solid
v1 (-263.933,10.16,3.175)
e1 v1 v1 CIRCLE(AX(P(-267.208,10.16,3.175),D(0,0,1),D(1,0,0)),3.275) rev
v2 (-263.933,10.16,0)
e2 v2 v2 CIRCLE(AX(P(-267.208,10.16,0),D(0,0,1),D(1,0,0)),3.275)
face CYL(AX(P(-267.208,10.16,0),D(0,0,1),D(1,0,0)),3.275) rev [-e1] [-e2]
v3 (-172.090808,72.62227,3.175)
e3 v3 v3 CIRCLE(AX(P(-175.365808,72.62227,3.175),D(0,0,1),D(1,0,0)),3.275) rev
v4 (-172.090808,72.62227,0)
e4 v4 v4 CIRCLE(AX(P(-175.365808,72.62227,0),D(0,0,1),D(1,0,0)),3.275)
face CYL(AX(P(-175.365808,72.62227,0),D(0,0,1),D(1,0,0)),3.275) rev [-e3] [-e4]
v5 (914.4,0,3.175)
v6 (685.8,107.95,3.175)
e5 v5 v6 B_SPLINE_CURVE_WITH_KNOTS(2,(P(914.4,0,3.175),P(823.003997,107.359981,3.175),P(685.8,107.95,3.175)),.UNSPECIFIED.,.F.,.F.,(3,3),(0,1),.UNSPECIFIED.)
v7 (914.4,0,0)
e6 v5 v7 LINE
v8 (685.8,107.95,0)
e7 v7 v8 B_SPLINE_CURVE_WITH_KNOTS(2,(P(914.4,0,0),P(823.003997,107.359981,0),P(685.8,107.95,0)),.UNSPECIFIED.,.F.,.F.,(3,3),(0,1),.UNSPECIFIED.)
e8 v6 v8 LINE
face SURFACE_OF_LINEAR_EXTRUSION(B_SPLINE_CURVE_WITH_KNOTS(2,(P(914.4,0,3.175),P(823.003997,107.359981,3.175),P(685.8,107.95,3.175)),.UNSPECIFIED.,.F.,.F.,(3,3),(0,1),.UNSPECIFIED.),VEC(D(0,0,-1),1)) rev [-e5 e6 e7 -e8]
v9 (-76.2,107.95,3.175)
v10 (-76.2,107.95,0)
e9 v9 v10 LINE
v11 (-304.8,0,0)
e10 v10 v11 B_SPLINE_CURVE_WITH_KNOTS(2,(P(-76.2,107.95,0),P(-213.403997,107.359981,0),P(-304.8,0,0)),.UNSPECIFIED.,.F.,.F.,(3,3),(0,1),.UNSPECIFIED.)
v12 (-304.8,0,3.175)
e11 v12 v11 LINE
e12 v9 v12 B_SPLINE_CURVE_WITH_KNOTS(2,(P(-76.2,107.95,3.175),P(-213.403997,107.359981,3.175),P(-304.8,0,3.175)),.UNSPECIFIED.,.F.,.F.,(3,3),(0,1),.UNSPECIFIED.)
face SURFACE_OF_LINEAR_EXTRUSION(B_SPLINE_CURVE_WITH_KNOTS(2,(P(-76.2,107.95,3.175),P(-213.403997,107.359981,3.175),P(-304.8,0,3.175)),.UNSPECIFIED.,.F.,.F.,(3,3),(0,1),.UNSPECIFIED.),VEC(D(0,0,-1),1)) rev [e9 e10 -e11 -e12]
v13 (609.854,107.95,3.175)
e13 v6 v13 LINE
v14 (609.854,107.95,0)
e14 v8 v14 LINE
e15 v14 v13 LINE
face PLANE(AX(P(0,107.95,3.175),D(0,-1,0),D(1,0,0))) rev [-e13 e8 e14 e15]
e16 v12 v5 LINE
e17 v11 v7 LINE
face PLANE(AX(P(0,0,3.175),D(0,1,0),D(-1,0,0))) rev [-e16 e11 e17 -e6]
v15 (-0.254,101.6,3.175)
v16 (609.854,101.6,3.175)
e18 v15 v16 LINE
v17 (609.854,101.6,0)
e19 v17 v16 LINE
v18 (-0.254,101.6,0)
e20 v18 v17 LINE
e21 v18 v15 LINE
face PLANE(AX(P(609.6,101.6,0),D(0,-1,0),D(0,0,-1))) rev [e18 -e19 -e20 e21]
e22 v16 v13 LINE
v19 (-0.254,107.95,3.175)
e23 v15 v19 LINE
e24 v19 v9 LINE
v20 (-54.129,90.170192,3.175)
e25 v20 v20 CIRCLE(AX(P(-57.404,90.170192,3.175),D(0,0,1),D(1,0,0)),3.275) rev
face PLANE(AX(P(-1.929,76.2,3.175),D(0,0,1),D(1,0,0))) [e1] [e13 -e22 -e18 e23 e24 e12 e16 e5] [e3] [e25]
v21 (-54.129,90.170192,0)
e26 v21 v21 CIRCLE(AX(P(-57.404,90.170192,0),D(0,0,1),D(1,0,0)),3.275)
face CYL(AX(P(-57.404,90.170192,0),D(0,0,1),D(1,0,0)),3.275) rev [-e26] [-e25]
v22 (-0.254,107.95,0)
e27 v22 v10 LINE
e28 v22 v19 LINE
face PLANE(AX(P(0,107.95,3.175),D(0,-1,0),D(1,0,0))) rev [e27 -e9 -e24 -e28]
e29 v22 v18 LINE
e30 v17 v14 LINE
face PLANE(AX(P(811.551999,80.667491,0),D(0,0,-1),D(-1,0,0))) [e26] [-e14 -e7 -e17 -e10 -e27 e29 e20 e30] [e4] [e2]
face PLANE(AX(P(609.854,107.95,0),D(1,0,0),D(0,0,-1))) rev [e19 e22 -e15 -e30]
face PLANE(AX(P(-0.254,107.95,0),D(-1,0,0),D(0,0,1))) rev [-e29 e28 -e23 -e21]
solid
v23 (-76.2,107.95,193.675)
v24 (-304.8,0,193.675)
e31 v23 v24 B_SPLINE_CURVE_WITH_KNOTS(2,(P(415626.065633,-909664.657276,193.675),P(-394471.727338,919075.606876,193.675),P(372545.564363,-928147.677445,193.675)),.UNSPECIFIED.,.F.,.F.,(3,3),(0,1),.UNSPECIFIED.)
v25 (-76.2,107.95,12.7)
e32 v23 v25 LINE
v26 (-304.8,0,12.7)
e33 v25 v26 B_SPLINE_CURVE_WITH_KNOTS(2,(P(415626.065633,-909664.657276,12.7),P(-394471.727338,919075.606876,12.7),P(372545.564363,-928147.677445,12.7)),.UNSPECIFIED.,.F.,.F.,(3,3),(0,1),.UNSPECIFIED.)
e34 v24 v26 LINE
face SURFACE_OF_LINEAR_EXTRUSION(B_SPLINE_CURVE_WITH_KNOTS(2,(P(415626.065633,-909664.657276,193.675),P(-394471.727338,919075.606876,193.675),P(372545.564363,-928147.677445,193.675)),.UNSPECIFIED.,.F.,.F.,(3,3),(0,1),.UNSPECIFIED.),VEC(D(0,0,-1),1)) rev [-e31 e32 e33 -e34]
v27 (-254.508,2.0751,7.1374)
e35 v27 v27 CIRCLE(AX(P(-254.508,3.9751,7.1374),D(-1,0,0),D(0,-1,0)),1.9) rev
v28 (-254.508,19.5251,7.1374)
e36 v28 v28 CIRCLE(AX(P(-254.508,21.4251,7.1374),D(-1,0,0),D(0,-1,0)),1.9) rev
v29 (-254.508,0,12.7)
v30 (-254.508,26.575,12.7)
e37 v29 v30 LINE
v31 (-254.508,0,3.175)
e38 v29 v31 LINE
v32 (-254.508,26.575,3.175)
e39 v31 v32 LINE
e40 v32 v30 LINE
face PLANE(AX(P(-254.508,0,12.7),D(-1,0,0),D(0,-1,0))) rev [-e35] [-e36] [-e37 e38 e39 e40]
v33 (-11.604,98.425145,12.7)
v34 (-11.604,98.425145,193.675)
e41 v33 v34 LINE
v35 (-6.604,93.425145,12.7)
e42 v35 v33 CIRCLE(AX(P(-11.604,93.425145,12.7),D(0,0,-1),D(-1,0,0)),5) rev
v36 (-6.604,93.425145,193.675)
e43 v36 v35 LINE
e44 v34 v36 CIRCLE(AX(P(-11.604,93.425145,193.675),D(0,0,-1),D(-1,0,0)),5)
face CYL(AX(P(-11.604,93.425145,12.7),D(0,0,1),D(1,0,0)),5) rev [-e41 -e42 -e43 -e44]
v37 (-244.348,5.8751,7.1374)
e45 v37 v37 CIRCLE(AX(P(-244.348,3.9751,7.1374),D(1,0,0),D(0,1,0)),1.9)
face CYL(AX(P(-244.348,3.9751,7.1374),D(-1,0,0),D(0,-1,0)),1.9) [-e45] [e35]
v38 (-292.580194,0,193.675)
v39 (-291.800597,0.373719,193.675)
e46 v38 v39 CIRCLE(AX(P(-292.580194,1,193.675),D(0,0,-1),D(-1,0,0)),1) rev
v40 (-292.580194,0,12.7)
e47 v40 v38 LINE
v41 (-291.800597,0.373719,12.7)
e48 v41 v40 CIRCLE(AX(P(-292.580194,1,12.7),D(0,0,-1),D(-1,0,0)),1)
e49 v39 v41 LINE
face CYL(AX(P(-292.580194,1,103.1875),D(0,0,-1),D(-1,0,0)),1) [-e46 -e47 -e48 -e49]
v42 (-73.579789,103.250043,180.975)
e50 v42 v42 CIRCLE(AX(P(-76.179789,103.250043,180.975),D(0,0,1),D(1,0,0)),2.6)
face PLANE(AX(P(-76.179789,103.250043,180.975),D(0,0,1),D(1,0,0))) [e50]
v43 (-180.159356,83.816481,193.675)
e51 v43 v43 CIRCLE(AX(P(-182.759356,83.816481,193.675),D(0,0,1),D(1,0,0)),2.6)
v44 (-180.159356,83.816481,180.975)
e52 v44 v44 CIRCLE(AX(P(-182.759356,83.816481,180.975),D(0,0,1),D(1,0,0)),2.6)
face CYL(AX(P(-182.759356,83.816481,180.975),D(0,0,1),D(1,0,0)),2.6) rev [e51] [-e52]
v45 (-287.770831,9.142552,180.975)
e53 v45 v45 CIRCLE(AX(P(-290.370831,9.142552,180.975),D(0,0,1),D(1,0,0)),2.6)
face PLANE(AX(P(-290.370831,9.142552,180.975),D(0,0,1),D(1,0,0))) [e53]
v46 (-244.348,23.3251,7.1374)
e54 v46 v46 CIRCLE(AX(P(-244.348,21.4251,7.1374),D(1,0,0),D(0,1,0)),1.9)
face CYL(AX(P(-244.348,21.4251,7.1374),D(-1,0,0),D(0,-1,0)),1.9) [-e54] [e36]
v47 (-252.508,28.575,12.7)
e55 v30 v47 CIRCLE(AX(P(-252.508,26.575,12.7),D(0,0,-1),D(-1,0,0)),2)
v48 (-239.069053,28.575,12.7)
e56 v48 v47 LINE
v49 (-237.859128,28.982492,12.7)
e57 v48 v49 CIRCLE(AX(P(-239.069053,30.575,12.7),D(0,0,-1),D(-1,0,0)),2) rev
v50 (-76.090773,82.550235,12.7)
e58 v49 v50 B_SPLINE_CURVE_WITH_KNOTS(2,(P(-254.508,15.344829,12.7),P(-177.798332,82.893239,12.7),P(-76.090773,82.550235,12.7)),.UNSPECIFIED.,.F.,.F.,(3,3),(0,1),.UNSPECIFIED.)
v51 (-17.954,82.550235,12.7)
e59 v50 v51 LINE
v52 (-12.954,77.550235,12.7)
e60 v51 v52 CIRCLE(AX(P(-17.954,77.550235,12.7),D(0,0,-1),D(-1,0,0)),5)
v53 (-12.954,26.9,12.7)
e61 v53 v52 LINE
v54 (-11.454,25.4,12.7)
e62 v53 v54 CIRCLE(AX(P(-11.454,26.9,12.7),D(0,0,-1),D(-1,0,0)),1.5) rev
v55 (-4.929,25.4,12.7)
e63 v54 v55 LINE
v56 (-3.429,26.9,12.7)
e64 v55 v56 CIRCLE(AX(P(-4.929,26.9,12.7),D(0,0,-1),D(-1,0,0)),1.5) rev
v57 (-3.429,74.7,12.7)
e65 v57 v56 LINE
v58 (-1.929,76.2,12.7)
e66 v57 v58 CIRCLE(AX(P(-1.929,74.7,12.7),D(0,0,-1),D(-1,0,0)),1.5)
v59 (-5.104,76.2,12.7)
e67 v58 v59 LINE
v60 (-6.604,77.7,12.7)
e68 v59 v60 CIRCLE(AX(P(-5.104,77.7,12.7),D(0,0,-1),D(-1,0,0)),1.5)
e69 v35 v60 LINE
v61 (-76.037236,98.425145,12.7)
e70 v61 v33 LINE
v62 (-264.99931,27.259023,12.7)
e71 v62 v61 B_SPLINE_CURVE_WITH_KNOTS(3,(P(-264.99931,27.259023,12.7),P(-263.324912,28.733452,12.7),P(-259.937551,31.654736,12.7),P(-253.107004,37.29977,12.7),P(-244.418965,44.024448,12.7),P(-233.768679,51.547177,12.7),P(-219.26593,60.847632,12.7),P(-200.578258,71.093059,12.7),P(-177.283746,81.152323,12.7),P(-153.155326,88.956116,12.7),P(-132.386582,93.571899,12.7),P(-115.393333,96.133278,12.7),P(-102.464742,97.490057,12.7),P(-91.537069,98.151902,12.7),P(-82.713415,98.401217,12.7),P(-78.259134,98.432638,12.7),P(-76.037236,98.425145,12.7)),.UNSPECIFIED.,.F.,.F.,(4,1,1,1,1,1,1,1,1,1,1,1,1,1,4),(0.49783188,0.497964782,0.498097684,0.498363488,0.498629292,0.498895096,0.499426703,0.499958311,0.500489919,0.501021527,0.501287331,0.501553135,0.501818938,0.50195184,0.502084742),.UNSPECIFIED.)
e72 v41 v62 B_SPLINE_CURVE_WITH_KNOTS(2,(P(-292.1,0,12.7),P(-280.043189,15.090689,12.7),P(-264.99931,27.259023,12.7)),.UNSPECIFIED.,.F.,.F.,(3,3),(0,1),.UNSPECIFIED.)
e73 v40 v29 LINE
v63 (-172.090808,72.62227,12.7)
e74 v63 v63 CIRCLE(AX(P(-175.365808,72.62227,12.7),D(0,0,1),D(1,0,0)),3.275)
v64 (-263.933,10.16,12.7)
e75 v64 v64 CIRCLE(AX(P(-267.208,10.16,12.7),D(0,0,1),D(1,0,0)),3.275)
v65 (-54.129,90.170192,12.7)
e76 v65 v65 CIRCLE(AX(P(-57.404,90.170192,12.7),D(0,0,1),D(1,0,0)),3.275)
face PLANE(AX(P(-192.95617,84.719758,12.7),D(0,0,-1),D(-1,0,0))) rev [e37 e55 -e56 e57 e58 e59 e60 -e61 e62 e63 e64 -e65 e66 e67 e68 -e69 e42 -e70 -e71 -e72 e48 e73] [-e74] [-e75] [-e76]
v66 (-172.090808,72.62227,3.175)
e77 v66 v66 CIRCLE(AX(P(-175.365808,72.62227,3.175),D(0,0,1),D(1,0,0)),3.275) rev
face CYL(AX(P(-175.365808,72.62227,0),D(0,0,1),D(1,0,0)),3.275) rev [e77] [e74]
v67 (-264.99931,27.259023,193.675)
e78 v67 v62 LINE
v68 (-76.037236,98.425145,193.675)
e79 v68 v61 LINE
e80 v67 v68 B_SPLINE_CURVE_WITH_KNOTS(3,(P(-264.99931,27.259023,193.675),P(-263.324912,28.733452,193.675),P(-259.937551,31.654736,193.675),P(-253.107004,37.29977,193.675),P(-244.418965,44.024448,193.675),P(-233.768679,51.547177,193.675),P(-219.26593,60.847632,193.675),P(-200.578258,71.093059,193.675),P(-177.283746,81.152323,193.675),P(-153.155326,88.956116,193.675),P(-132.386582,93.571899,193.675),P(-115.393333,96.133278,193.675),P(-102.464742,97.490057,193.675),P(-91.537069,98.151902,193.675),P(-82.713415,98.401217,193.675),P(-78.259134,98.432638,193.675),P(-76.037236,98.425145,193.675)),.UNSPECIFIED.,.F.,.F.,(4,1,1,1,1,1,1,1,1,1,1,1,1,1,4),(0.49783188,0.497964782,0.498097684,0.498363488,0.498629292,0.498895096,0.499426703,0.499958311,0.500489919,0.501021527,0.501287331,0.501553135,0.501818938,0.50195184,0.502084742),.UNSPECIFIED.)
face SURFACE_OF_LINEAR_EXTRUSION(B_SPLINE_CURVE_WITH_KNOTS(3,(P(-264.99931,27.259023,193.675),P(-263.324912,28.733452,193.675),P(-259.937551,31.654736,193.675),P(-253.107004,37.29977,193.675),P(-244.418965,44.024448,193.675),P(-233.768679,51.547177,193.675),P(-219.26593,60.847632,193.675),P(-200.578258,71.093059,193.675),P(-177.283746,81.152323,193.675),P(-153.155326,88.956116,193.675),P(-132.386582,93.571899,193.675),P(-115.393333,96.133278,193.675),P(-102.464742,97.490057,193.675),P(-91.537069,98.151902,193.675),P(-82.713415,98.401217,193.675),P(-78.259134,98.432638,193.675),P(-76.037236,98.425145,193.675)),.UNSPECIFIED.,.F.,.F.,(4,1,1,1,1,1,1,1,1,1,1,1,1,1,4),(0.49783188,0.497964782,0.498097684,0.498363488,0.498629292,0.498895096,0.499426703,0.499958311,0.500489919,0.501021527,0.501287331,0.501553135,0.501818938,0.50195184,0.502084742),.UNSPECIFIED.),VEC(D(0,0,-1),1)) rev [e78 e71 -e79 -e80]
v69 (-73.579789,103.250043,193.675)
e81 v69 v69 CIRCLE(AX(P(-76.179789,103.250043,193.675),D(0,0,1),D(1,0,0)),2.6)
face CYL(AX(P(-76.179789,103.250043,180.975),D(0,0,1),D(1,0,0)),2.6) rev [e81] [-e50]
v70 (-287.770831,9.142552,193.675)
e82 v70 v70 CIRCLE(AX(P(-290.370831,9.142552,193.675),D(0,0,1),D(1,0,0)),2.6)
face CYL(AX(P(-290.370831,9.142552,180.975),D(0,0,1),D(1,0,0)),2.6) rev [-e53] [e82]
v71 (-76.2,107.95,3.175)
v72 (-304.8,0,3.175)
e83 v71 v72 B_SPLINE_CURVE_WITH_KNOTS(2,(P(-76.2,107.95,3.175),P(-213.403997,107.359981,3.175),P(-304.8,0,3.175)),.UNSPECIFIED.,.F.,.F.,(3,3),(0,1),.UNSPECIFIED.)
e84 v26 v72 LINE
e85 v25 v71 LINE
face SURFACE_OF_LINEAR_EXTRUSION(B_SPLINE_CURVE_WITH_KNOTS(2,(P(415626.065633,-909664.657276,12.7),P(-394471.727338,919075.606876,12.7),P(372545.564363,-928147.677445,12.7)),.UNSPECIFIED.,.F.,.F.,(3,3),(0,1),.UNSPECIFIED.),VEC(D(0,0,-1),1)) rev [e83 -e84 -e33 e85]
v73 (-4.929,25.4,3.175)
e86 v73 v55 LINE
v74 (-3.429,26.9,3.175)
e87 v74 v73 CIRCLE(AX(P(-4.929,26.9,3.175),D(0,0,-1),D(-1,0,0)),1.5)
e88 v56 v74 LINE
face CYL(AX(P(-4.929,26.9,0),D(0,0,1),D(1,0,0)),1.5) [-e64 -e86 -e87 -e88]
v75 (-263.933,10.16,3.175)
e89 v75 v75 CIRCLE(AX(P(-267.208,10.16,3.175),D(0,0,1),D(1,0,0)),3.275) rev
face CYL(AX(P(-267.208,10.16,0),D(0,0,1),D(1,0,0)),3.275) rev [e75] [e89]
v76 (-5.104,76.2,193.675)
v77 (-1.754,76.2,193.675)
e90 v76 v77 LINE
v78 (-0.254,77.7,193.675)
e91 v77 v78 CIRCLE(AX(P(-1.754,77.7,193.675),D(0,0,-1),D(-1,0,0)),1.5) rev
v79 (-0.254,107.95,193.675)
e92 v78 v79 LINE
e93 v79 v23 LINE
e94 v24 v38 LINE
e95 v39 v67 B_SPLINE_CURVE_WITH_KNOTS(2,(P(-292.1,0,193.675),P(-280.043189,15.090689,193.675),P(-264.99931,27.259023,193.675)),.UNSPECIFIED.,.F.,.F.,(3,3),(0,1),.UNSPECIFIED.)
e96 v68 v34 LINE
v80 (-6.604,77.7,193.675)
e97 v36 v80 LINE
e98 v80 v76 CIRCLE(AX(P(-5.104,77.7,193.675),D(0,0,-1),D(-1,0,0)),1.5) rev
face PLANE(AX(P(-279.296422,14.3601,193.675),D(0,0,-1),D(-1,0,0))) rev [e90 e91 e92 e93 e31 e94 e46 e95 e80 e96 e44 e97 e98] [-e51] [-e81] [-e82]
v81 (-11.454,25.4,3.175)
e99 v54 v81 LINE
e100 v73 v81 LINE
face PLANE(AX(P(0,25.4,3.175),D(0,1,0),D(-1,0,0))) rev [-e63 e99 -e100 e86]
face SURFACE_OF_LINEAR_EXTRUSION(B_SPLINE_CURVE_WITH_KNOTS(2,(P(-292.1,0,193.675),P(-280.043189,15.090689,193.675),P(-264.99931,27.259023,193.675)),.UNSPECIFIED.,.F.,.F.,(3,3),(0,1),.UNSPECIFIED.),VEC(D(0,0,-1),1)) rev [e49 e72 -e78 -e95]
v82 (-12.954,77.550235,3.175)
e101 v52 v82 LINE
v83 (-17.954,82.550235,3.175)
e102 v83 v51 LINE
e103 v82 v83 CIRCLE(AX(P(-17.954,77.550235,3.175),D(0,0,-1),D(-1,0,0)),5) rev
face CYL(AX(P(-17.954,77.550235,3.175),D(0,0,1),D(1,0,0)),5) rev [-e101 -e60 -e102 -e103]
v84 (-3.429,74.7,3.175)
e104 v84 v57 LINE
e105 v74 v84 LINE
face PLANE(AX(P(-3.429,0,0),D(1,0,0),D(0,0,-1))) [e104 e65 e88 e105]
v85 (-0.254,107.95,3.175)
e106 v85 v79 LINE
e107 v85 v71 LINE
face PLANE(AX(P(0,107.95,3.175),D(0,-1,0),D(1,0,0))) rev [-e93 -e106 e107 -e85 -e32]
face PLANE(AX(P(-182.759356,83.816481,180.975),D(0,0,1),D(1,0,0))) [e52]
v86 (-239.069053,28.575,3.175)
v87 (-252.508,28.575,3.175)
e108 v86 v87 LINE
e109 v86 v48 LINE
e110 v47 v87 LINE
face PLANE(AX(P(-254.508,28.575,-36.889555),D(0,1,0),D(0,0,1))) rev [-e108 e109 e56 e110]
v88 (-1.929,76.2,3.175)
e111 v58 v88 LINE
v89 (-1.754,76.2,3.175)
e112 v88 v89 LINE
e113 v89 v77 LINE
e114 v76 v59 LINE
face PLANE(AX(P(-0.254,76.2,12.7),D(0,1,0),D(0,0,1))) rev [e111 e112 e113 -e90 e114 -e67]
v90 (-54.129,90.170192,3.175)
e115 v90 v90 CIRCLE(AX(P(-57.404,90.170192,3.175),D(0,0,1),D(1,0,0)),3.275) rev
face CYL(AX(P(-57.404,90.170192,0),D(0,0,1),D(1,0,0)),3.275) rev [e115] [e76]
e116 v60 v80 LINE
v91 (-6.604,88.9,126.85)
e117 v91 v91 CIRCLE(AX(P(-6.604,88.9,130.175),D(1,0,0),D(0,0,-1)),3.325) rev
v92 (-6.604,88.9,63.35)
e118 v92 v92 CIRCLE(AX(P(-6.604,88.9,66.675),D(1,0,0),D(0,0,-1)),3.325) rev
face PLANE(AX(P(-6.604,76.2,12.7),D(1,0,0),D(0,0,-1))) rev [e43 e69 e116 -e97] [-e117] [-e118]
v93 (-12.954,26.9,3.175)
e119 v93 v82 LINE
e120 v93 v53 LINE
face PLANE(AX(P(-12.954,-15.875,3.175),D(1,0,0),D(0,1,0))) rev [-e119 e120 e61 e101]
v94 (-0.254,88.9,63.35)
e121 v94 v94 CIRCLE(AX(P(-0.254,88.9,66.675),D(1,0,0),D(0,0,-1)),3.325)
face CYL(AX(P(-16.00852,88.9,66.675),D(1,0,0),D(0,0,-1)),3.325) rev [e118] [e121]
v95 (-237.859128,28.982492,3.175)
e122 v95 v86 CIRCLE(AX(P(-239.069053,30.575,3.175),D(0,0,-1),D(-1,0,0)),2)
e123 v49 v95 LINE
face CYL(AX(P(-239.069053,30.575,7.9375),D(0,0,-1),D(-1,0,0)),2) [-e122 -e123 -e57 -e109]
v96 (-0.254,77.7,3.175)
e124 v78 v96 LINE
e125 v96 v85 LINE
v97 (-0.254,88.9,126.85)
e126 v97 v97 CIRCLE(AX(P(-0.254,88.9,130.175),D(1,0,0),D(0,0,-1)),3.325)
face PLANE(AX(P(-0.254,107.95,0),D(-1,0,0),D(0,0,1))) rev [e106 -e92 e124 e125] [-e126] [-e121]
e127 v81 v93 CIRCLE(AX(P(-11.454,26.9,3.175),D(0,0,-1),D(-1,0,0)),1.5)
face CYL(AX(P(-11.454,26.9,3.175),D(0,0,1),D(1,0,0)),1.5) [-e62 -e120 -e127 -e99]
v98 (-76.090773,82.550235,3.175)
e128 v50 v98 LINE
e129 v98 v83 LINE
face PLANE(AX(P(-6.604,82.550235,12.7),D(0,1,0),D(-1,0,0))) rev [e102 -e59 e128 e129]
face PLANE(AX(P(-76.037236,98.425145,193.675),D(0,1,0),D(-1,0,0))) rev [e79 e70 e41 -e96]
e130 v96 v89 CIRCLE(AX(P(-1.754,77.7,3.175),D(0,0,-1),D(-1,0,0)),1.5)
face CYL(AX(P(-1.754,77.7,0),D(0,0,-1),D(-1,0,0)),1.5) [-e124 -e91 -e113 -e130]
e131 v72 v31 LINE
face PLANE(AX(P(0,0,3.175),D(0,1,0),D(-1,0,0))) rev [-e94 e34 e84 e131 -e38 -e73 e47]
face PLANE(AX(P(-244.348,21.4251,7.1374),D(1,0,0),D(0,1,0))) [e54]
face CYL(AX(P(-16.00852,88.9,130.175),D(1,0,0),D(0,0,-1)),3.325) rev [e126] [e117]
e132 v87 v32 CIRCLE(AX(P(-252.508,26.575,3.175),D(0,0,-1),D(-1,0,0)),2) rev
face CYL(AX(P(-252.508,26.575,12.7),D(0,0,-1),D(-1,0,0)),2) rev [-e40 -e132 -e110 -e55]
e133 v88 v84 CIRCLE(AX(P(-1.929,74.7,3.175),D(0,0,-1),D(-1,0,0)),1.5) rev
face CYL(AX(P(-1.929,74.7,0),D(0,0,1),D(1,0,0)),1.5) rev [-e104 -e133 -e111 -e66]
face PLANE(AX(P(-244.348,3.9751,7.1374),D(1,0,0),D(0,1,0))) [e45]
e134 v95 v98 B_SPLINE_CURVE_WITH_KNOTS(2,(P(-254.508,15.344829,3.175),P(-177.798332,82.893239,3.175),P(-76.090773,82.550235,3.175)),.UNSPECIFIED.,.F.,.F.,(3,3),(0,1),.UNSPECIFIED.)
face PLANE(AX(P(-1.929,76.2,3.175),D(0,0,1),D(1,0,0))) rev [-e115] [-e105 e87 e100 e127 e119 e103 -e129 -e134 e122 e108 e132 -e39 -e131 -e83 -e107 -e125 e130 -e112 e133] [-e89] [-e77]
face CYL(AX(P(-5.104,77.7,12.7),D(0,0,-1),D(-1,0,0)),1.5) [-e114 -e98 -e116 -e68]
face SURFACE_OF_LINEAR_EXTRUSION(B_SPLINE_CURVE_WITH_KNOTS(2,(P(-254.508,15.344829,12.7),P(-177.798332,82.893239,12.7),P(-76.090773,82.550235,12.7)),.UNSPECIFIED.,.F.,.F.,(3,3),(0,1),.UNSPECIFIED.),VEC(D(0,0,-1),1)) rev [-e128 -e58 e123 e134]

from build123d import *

# Parameters (mm, degrees)
BOSS_EXTRUDE1_DEPTH = 3.175
CUT_EXTRUDE1_DEPTH  = 921.755474233
BOSS_EXTRUDE2_DEPTH = 9.525
BOSS_EXTRUDE3_DEPTH = 180.975
SKETCH6_W           = 28.082698006
SKETCH6_H           = 28.575
CUT_EXTRUDE2_DEPTH  = 9.525
SKETCH7_R           = 3.275
CUT_EXTRUDE3_DEPTH  = 939.366939617
SKETCH8_R           = 3.325
CUT_EXTRUDE5_DEPTH  = 6.35
SKETCH9_R           = 2.6
SKETCH9_R_2         = 2.600000001
CUT_EXTRUDE6_DEPTH  = 12.7
SKETCH11_R          = 1.9
BOSS_EXTRUDE5_DEPTH = 10.16
SKETCH14_W          = 12.7
SKETCH14_H          = 9.525
BOSS_EXTRUDE8_DEPTH = 57.150234853
SKETCH17_W          = 9.525
SKETCH17_H          = 50.8
CUT_EXTRUDE9_DEPTH  = 3.175
FILLET1_R           = 5
FILLET2_R           = 2
FILLET3_R           = 1
FILLET8_R           = 5
FILLET9_R           = 1.5
FILLET10_R          = 1.5


# Read off the part's stored shape, not the designer's step: Split2
with BuildPart() as part:
    # Sketch1 → Boss-Extrude1 (new body)
    with BuildSketch(Plane.XY):
        with BuildLine():
            Line((0, 0), (-304.8, 0))
            add(Edge.make_bspline(
                [(-304.8, 0), (-213.403997347, 107.359981337), (-76.2, 107.95)],
                knots=[0, 0, 0, 1, 1, 1], degree=2))
            Line((-76.2, 107.95), (0, 107.95))
            Line((0, 107.95), (609.6, 107.95))
            Line((609.6, 107.95), (685.8, 107.95))
            add(Edge.make_bspline(
                [(914.4, 0), (823.003997347, 107.359981337), (685.8, 107.95)],
                knots=[0, 0, 0, 1, 1, 1], degree=2))
            Line((914.4, 0), (609.6, 0))
            Line((609.6, 0), (0, 0))
        make_face()
    extrude(amount=BOSS_EXTRUDE1_DEPTH)

    # Sketch2 → Cut-Extrude1 (cut, through all)
    with BuildSketch(Plane.XY.offset(3.175)):
        Polygon((0, 107.95), (609.6, 107.95), (609.854, 107.95), (609.854, 101.6), (609.6, 101.6), (0, 101.6), (-0.254, 101.6), (-0.254, 107.95), align=None)
    extrude(amount=-CUT_EXTRUDE1_DEPTH, mode=Mode.SUBTRACT)

    # Sketch3 → Boss-Extrude2 (add)
    with BuildSketch(Plane.XY.offset(3.175)):
        with BuildLine():
            Line((-304.8, 0), (-254.508, 0))
            Line((-254.508, 0), (-254.508, 15.344828713))
            add(Edge.make_bspline(
                [(-254.508, 15.344828713), (-177.798332328, 82.893238953), (-76.090773332, 82.550234853)],
                knots=[0, 0, 0, 1, 1, 1], degree=2))
            Line((-76.090773332, 82.550234853), (-6.604, 82.550234853))
            Line((-6.604, 82.550234853), (-6.604, 76.2))
            Line((-6.604, 76.2), (-0.254, 76.2))
            Line((-0.254, 76.2), (-0.254, 107.95))
            Line((-0.254, 107.95), (-76.2, 107.95))
            add(Edge.make_bspline(
                [(-76.2, 107.95), (-213.403997347, 107.359981337), (-304.8, 0)],
                knots=[0, 0, 0, 1, 1, 1], degree=2))
        make_face()
    extrude(amount=BOSS_EXTRUDE2_DEPTH)

    # Sketch5 → Boss-Extrude3 (add)
    with BuildSketch(Plane.XY.offset(12.7)):
        with BuildLine():
            Line((-304.8, 0), (-292.1, 0))
            add(Edge.make_bspline(
                [(-264.999310143, 27.259023461), (-280.043189094, 15.090688978), (-292.1, 0)],
                knots=[0, 0, 0, 1, 1, 1], degree=2))
            add(Edge.make_bspline(
                [(-264.999310143, 27.259023461), (-263.324912471, 28.733451708), (-259.93755133, 31.654735884), (-253.107003874, 37.29977015), (-244.418964995, 44.024448353), (-233.76867915, 51.547177424), (-219.265929961, 60.847632169), (-200.578257731, 71.093058658), (-177.28374589, 81.152323376), (-153.155325898, 88.956116173), (-132.386582303, 93.571898544), (-115.39333326, 96.133277835), (-102.464741628, 97.490056952), (-91.537068573, 98.151901873), (-82.713415498, 98.401217113), (-78.259134389, 98.432637828), (-76.037235922, 98.425144577)],
                knots=[0.49783188, 0.49783188, 0.49783188, 0.49783188, 0.497964782, 0.498097684, 0.498363488, 0.498629292, 0.498895096, 0.499426703, 0.499958311, 0.500489919, 0.501021527, 0.501287331, 0.501553135, 0.501818938, 0.50195184, 0.502084742, 0.502084742, 0.502084742, 0.502084742], degree=3))
            Line((-76.037235922, 98.425144577), (-6.604, 98.425144577))
            Line((-6.604, 98.425144577), (-6.604, 82.550234853))
            Line((-6.604, 82.550234853), (-6.604, 76.2))
            Line((-6.604, 76.2), (-0.254, 76.2))
            Line((-0.254, 76.2), (-0.254, 107.95))
            Line((-0.254, 107.95), (-76.199999999, 107.95))
            add(Edge.make_bspline(
                [(-76.199999999, 107.95), (-213.403997347, 107.359981337), (-304.8, 0)],
                knots=[0, 0, 0, 1, 1, 1], degree=2))
        make_face()
    extrude(amount=BOSS_EXTRUDE3_DEPTH)

    # Sketch6 → Cut-Extrude2 (cut)
    with BuildSketch(Plane.XY.offset(12.7)):
        with Locations((-240.466650997, 14.2875)):
            Rectangle(SKETCH6_W, SKETCH6_H)
    extrude(amount=-CUT_EXTRUDE2_DEPTH, mode=Mode.SUBTRACT)

    # Sketch7 → Cut-Extrude3 (cut, through all)
    with BuildSketch(Plane.XY.offset(12.7)):
        with Locations((-267.208, 10.16)):
            Circle(SKETCH7_R)
        with Locations((-175.365808452, 72.622269579)):
            Circle(SKETCH7_R)
        with Locations((-57.404, 90.17019152)):
            Circle(SKETCH7_R)
    extrude(amount=-CUT_EXTRUDE3_DEPTH, mode=Mode.SUBTRACT)

    # Sketch8 → Cut-Extrude5 (cut)
    with BuildSketch(Plane(origin=(-0.254, 0, 0), x_dir=(0, 0, -1), z_dir=(1, 0, 0))):
        with Locations((-66.675, 88.9)):
            Circle(SKETCH8_R)
        with Locations((-130.175, 88.9)):
            Circle(SKETCH8_R)
    extrude(amount=-CUT_EXTRUDE5_DEPTH, mode=Mode.SUBTRACT)

    # Sketch9 → Cut-Extrude6 (cut)
    with BuildSketch(Plane.XY.offset(193.675)):
        with Locations((-290.370830702, 9.142552388)):
            Circle(SKETCH9_R)
        with Locations((-182.759356376, 83.816480509)):
            Circle(SKETCH9_R)
        with Locations((-76.179788765, 103.250043457)):
            Circle(SKETCH9_R_2)
    extrude(amount=-CUT_EXTRUDE6_DEPTH, mode=Mode.SUBTRACT)

    # Sketch11 → Boss-Extrude5 (add)
    with BuildSketch(Plane(origin=(-254.508, 2e-09, 0), x_dir=(0, 0, -1), z_dir=(1.0, -6.037741648177811e-12, 0))):
        with Locations(Location((-7.1374, 3.975099998, 0), (0, 0, 270))):
            Circle(SKETCH11_R)
        with Locations(Location((-7.1374, 21.425099998, 0), (0, 0, 270))):
            Circle(SKETCH11_R)
    extrude(amount=BOSS_EXTRUDE5_DEPTH)

    # Sketch14 → Boss-Extrude8 (add)
    with BuildSketch(Plane.XZ.offset(-82.550234853)):
        with Locations((-6.604, 7.9375)):
            Rectangle(SKETCH14_W, SKETCH14_H)
    extrude(amount=BOSS_EXTRUDE8_DEPTH)

    # Sketch17 → Cut-Extrude9 (cut)
    with BuildSketch(Plane(origin=(-0.254, 0, 0), x_dir=(0, 0, -1), z_dir=(1, 0, 0))):
        with Locations((-7.9375, 50.8)):
            Rectangle(SKETCH17_W, SKETCH17_H)
    extrude(amount=-CUT_EXTRUDE9_DEPTH, mode=Mode.SUBTRACT)

    # Fillet1
    fillet1_edges = [part.edges().sort_by_distance(p)[0] for p in [
        (-6.604, 98.425144577, 103.1875),
    ]]
    fillet(fillet1_edges, radius=FILLET1_R)

    # Fillet2
    fillet2_edges = [part.edges().sort_by_distance(p)[0] for p in [
        (-238.394170448, 28.575, 7.9375),
        (-254.508, 28.575, 7.9375),
    ]]
    fillet(fillet2_edges, radius=FILLET2_R)

    # Fillet3
    # the kernel refuses this fillet: 1 mm, written as the material it takes off along each edge
    with BuildSketch(Plane(origin=(-292.1, 0, 12.7), x_dir=(0.6252400597778598, 0.7804324875663354, 0), z_dir=(0, 0, 1))) as fillet3_piece_1:
        with BuildLine():
            CenterArc((0.480195921, 0.999999109), FILLET3_R, 218.699809372, 51.223710378)
            Line((-0.300236566, 0.374759049), (-0.315845216, 0.362254248))
            Line((-0.315845216, 0.362254248), (-0.01560865, -0.012504801))
            Line((-0.01560865, -0.012504801), (2.669e-05, -0.019999982))
            ThreePointArc((2.669e-05, -0.019999982), (0.239430546, -0.019840221), (0.478834393, -0.019999982))
            Line((0.478834393, -0.019999982), (0.478861089, 0))
        make_face()
    extrude(amount=180.975, mode=Mode.SUBTRACT)

    # Fillet8
    fillet8_edges = [part.edges().sort_by_distance(p)[0] for p in [
        (-12.954, 82.550234853, 7.9375),
    ]]
    fillet(fillet8_edges, radius=FILLET8_R)

    # Fillet9
    fillet9_edges = [part.edges().sort_by_distance(p)[0] for p in [
        (-12.954, 25.4, 7.9375),
        (-3.429, 25.4, 7.9375),
        (-6.604, 76.2, 103.1875),
        (-0.254, 76.2, 98.425),
    ]]
    fillet(fillet9_edges, radius=FILLET9_R)

    # Fillet10
    fillet10_edges = [part.edges().sort_by_distance(p)[0] for p in [
        (-3.429, 76.2, 7.9375),
    ]]
    fillet(fillet10_edges, radius=FILLET10_R)


with BuildPart() as body_2:
    # Split2: the piece on the far side of the plane
    add(part.part)
    split(bisect_by=Plane.XY.offset(3.175), keep=Keep.BOTTOM)


with BuildPart() as part_1:
    add(part.part)

    # Split2
    split(bisect_by=Plane.XY.offset(3.175), keep=Keep.TOP)


solid = Compound([body_2.part, part_1.part])
